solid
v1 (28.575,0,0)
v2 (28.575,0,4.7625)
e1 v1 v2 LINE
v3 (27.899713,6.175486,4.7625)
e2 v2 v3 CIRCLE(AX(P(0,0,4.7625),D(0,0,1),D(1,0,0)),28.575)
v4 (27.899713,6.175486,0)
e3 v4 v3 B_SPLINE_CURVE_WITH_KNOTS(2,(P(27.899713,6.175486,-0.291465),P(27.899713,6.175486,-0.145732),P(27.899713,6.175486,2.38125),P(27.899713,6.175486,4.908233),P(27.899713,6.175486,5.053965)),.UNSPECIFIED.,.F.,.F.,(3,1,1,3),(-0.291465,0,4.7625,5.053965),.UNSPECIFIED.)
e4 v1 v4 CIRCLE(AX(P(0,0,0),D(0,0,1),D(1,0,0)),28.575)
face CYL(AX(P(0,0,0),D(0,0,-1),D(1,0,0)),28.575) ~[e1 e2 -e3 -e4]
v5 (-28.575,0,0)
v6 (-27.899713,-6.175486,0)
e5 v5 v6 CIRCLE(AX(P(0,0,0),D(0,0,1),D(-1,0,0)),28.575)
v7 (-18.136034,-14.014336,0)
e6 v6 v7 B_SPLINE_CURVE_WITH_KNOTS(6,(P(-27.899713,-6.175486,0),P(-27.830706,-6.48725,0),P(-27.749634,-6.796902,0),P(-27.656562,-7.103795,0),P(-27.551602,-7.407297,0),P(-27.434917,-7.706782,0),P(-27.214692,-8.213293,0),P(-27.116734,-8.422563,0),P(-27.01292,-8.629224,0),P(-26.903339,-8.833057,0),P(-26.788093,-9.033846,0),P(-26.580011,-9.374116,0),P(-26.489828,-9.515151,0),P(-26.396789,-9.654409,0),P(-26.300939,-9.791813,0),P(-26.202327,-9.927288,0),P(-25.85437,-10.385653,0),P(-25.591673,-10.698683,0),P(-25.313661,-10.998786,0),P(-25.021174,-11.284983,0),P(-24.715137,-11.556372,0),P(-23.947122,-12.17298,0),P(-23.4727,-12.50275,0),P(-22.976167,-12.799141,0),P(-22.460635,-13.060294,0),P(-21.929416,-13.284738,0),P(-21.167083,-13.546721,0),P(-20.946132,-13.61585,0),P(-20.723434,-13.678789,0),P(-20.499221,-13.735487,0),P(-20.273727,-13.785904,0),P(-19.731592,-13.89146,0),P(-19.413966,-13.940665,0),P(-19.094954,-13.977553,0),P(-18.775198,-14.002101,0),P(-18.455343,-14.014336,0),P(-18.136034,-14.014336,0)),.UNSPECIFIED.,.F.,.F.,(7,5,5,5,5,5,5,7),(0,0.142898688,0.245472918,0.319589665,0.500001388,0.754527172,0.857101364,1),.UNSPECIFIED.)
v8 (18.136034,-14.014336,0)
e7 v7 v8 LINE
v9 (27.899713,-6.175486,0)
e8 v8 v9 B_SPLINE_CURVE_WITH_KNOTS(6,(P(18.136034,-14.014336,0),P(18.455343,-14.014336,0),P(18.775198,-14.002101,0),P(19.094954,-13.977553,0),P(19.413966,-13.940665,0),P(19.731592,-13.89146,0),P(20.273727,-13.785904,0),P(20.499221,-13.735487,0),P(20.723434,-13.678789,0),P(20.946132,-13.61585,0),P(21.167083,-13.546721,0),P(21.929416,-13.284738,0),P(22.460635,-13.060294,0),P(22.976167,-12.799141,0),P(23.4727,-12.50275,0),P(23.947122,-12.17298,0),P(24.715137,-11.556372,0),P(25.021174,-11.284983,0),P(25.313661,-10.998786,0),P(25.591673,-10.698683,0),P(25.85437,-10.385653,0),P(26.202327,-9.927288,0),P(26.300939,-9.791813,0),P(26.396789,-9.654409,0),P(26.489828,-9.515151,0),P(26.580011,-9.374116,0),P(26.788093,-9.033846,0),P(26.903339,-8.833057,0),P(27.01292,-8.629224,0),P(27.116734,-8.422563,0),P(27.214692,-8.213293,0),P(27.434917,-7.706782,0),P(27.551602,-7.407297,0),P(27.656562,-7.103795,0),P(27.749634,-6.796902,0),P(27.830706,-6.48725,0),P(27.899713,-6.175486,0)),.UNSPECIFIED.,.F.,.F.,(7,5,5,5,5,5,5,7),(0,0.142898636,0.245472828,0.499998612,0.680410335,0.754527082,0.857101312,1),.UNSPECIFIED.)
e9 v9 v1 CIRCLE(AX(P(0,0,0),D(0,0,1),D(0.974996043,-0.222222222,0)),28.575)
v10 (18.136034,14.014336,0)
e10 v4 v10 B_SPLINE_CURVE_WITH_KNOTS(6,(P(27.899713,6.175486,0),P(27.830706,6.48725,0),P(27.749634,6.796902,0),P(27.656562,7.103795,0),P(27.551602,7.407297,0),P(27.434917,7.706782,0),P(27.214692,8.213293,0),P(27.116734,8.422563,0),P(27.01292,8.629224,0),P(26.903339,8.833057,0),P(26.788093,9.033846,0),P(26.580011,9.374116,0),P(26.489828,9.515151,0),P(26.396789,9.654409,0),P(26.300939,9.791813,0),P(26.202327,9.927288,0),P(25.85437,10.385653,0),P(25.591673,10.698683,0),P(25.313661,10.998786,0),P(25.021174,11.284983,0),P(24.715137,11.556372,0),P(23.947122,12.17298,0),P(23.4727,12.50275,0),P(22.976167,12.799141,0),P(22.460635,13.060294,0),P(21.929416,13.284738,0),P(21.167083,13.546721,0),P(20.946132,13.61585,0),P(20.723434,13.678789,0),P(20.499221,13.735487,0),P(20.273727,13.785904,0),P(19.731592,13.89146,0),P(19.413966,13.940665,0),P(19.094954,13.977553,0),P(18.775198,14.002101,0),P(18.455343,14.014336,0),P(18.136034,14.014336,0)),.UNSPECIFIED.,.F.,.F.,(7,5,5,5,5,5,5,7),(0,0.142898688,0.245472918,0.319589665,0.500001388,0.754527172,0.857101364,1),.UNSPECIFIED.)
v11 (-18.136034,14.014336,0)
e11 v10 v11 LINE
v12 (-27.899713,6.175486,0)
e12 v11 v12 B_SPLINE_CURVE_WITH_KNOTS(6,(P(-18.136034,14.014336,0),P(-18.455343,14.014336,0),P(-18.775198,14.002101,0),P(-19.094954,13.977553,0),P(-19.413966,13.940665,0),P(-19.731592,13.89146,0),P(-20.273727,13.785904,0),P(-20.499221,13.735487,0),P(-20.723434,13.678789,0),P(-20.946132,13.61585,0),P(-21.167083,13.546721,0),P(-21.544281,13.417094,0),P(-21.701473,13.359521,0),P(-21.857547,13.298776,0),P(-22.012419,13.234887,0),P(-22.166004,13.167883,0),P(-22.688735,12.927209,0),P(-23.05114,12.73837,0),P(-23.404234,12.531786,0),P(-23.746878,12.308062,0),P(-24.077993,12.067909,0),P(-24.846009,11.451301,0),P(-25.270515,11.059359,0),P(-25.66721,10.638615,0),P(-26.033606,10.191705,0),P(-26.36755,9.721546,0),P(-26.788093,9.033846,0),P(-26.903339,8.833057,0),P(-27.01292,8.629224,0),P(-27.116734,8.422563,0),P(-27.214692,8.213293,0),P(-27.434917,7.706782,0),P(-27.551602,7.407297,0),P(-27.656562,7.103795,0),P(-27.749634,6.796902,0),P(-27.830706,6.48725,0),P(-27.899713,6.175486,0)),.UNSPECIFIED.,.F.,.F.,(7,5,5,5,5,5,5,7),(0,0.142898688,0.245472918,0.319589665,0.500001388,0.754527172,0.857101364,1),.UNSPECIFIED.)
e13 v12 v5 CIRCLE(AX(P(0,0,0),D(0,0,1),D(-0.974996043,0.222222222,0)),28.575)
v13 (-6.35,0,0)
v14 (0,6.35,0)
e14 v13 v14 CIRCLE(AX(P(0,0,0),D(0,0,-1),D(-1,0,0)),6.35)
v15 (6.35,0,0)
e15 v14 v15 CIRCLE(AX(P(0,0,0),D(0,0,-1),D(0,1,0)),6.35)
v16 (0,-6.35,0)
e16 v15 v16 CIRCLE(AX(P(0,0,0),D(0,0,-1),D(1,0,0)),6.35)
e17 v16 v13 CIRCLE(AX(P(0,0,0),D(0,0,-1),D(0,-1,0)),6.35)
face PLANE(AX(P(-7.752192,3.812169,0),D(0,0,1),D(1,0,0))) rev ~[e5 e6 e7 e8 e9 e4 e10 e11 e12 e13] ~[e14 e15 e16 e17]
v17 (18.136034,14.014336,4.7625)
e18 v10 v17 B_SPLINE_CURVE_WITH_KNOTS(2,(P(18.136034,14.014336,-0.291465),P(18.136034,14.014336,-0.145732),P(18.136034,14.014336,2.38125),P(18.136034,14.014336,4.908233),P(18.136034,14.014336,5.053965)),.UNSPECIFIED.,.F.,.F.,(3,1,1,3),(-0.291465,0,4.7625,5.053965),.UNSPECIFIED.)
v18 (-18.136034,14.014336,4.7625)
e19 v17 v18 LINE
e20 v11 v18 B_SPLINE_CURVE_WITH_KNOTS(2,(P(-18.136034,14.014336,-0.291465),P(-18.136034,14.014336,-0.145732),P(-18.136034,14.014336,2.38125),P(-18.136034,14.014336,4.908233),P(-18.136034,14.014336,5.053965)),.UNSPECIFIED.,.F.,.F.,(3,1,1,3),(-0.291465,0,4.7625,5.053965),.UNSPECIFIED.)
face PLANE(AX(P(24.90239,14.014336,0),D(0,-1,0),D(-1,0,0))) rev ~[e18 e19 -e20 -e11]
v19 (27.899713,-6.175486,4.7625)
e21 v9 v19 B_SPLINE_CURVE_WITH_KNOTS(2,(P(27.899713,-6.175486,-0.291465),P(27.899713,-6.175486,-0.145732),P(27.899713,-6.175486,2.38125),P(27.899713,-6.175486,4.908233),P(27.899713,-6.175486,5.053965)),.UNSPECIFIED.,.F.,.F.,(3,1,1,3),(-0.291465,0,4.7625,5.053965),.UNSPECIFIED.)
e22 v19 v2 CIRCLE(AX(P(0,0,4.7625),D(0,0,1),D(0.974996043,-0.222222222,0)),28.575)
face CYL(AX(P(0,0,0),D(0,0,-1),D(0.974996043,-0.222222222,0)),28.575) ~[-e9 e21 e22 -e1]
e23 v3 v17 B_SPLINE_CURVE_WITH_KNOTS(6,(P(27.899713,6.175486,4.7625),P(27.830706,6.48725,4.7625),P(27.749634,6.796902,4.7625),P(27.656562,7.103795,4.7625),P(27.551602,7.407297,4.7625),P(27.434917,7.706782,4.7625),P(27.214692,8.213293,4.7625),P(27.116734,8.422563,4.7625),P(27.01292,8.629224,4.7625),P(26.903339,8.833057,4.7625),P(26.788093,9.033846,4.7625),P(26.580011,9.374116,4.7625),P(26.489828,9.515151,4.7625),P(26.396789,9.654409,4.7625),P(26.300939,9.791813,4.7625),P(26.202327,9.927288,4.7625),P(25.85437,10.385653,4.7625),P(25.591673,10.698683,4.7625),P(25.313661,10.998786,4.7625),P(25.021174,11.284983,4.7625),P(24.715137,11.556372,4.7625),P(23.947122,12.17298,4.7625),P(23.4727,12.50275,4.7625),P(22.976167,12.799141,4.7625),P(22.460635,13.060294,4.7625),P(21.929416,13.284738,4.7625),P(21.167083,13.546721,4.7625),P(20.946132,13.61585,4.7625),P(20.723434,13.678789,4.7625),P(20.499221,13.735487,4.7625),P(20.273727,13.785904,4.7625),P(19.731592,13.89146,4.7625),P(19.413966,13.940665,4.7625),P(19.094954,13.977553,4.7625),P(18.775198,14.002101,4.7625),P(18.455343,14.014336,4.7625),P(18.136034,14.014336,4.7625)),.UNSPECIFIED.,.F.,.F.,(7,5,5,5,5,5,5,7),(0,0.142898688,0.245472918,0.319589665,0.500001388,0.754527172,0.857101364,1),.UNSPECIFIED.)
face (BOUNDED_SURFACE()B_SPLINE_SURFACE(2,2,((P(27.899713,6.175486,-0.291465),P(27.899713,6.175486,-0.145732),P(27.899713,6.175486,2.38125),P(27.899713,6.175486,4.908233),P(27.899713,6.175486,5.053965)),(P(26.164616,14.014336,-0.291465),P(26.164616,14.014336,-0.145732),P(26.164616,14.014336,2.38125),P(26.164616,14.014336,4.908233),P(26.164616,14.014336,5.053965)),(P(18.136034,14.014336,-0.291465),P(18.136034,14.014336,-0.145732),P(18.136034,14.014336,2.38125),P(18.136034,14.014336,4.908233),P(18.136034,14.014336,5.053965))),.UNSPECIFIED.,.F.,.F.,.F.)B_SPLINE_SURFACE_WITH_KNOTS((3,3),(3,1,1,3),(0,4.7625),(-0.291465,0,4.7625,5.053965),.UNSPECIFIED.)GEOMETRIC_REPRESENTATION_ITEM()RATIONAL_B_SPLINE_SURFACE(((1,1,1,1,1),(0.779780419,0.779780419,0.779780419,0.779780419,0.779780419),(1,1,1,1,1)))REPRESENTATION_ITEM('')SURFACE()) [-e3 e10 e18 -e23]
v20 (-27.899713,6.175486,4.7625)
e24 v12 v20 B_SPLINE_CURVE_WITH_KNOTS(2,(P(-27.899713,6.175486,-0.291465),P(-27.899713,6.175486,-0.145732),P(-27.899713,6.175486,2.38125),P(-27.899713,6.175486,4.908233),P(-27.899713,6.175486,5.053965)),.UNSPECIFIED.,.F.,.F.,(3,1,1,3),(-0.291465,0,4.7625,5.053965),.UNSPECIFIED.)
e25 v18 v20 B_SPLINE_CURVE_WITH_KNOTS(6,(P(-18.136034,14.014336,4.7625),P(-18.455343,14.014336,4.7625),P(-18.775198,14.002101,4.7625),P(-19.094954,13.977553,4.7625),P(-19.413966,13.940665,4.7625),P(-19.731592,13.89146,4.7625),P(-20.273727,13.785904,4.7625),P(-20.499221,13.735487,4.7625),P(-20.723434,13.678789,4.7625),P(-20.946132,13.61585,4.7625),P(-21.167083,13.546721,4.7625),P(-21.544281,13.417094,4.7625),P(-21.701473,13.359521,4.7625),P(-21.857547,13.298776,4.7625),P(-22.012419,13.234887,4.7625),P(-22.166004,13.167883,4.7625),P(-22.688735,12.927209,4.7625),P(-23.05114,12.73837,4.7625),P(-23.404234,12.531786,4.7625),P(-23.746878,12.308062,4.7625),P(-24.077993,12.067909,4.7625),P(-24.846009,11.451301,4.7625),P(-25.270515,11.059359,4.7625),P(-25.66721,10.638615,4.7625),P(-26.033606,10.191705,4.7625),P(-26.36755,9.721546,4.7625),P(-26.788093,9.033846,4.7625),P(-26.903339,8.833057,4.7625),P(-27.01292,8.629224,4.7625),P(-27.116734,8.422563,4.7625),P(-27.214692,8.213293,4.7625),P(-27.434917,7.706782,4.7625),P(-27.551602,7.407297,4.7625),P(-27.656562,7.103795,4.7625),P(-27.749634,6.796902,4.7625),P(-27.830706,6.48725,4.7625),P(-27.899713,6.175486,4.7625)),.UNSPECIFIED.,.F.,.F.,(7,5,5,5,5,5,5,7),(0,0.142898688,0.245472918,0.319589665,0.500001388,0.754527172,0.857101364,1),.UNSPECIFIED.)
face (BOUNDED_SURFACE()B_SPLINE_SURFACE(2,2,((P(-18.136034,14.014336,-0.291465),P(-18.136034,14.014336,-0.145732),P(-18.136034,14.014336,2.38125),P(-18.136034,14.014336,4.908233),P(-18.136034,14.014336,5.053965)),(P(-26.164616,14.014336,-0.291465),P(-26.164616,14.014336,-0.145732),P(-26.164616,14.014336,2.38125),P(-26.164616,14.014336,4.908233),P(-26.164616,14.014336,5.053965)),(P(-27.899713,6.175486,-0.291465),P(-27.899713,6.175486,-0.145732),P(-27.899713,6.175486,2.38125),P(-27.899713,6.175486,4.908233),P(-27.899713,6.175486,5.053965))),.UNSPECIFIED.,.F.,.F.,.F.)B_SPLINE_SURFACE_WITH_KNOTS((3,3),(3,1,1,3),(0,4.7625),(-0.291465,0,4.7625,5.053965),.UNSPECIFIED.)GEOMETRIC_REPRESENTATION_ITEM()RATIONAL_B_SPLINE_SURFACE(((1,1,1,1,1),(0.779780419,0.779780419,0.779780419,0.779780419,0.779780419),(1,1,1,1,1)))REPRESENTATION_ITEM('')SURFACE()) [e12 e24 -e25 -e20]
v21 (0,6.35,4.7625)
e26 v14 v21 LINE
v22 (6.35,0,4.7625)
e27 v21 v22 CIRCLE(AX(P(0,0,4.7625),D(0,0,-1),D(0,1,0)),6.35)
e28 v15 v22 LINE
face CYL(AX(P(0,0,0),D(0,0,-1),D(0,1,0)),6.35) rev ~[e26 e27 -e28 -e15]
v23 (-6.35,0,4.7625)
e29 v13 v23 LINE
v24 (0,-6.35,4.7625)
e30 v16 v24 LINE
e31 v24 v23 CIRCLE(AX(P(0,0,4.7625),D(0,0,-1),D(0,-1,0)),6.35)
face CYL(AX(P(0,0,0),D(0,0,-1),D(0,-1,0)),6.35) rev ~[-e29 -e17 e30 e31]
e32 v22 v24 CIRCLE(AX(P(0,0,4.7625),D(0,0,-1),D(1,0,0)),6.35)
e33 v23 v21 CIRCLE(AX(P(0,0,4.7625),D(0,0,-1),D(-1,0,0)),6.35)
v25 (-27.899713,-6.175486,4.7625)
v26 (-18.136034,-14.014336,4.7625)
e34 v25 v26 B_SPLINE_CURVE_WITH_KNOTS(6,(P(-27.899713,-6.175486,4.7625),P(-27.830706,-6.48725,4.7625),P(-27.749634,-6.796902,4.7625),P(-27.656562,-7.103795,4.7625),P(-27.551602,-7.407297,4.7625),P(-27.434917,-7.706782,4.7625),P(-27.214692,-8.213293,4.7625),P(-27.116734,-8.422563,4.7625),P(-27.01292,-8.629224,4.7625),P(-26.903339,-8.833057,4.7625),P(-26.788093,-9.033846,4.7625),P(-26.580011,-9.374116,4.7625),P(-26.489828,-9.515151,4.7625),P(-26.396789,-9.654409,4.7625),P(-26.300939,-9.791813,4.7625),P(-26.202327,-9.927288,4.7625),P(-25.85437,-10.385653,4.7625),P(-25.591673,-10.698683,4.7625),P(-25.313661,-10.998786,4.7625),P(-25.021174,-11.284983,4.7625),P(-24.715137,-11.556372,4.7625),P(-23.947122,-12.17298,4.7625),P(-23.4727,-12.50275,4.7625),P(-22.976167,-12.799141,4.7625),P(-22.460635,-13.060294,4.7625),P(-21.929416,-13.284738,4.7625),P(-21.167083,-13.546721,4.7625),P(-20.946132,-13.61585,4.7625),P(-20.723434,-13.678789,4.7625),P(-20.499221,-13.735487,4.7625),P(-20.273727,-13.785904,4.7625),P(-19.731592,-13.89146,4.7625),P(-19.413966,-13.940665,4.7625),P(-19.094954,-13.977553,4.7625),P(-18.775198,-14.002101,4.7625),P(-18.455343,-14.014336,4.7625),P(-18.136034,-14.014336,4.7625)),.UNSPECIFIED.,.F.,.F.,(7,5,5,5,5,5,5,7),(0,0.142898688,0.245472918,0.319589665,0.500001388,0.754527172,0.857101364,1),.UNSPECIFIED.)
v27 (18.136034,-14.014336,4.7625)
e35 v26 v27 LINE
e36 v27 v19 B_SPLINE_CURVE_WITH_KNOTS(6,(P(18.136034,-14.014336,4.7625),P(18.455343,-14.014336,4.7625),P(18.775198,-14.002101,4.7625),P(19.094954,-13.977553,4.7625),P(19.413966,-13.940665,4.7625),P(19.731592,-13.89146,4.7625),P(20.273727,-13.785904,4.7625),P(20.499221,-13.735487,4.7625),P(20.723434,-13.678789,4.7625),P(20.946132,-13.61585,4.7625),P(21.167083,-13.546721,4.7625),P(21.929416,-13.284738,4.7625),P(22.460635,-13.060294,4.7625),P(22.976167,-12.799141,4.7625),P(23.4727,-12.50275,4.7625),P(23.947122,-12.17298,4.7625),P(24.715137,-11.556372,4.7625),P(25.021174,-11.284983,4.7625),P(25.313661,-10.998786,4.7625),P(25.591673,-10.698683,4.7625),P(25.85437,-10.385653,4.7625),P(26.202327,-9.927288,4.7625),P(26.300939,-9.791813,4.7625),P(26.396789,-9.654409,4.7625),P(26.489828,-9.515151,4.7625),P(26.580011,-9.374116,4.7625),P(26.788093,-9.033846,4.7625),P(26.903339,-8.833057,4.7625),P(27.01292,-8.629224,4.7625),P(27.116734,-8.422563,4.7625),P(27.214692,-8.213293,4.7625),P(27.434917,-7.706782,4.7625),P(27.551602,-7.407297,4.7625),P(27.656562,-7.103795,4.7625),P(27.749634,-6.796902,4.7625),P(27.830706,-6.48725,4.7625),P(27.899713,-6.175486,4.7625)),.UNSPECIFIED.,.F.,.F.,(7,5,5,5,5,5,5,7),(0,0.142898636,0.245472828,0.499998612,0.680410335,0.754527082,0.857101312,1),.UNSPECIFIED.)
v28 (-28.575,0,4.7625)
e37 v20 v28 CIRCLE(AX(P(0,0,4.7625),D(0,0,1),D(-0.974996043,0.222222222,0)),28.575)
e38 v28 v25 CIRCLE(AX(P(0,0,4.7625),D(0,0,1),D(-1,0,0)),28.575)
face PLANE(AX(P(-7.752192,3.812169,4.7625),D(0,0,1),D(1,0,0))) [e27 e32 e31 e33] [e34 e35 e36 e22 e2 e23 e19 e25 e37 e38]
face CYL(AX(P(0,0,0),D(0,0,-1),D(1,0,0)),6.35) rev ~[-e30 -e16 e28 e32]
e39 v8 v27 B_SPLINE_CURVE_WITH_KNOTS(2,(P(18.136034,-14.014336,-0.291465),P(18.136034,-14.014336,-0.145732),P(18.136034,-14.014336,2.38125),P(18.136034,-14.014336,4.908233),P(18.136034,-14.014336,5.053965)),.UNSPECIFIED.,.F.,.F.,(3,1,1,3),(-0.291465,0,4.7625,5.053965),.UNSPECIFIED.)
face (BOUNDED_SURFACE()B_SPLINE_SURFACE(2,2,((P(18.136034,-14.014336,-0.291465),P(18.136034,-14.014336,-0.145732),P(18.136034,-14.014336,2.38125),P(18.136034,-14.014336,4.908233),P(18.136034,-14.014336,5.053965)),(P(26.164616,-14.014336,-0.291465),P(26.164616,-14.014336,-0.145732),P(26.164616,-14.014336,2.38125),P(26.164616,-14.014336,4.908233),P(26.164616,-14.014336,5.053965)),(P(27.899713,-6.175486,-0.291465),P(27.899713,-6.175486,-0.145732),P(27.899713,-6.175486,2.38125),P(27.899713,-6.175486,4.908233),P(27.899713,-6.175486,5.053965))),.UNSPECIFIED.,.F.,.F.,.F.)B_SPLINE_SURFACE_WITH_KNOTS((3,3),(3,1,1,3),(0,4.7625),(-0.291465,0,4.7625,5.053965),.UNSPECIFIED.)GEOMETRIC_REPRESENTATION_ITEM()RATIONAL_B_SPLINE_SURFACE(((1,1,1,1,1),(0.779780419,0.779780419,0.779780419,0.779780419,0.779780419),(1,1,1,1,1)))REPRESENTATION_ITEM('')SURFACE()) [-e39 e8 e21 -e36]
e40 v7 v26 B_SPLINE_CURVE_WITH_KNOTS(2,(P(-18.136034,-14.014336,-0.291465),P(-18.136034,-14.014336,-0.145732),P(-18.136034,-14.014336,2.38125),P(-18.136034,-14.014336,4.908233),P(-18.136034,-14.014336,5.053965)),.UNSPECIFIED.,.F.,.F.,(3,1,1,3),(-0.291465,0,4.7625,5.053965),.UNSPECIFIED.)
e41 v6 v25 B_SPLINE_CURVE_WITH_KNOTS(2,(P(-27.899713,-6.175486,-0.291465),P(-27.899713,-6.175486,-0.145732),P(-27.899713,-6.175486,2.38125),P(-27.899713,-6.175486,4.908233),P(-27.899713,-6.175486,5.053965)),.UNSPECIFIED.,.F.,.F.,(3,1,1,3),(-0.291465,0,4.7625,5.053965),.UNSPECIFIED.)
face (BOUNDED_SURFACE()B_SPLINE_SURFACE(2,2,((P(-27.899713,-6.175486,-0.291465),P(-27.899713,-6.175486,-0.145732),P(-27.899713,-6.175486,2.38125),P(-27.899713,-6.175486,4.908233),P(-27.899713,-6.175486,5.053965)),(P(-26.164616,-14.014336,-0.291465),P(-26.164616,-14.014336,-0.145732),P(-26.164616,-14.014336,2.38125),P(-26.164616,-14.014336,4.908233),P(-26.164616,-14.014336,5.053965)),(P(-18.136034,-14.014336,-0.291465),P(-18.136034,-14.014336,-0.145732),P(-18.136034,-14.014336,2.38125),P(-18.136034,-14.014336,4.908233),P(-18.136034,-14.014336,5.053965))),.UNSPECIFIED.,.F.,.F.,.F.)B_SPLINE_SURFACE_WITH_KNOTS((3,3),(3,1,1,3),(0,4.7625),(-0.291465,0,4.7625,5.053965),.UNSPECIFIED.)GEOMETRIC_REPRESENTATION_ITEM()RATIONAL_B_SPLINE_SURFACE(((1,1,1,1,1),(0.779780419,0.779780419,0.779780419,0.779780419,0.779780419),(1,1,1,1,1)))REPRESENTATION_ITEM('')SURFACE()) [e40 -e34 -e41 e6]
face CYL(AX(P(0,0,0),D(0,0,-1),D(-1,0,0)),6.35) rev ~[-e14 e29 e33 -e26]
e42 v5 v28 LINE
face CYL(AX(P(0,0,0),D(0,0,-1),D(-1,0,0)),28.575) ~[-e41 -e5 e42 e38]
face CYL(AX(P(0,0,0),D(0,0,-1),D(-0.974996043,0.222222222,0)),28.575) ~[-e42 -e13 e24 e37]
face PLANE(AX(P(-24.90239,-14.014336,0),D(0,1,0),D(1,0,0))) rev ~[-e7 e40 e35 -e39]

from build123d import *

# Parameters (mm, degrees)
F1_DEPTH = 4.7625
F2_R     = 10


# Not quite as in the source:
# - a feature names something its author has since deleted; it is built from what else it names


with BuildPart() as f1:
    # F0 (on Top) → F1 (new body)
    with BuildSketch(Plane.XY):
        with BuildLine():
            ThreePointArc((-6.35, 0), (-4.4901280605, 4.4901280605), (0, 6.35))
            Line((0, 6.35), (-12.4931629071, 6.35))
            ThreePointArc((-12.4931629071, 6.35), (-13.6287381062, 3.2648303256), (-14.0143362106, 0))
            Line((-14.0143362106, 0), (-6.35, 0))
        make_face()
        with BuildLine():
            ThreePointArc((0, 6.35), (4.4901280605, 4.4901280605), (6.35, 0))
            Line((6.35, 0), (14.0143362106, 0))
            ThreePointArc((14.0143362106, 0), (13.6287381062, 3.2648303256), (12.4931629071, 6.35))
            Line((12.4931629071, 6.35), (0, 6.35))
        make_face()
        with BuildLine():
            Line((12.4931629071, -6.35), (0, -6.35))
            Line((0, -6.35), (0, -14.0143362106))
            ThreePointArc((0, -14.0143362106), (7.3283894713, -11.9455567966), (12.4931629071, -6.35))
        make_face()
        with BuildLine():
            Line((0, -14.0143362106), (0, -6.35))
            Line((0, -6.35), (-12.4931629071, -6.35))
            ThreePointArc((-12.4931629071, -6.35), (-7.3283894713, -11.9455567966), (0, -14.0143362106))
        make_face()
        with BuildLine():
            Line((-12.4931629071, -6.35), (0, -6.35))
            ThreePointArc((0, -6.35), (-4.4901280605, -4.4901280605), (-6.35, 0))
            Line((-6.35, 0), (-14.0143362106, 0))
            ThreePointArc((-14.0143362106, 0), (-13.6287381062, -3.2648303256), (-12.4931629071, -6.35))
        make_face()
        with BuildLine():
            Line((-27.86051193, -6.35), (-12.4931629071, -6.35))
            ThreePointArc((-12.4931629071, -6.35), (-13.6287381062, -3.2648303256), (-14.0143362106, 0))
            Line((-14.0143362106, 0), (-28.575, 0))
            ThreePointArc((-28.575, 0), (-28.395816183, -3.1950349451), (-27.86051193, -6.35))
        make_face()
        with BuildLine():
            ThreePointArc((12.4931629071, 6.35), (13.6287381062, 3.2648303256), (14.0143362106, 0))
            Line((14.0143362106, 0), (28.575, 0))
            ThreePointArc((28.575, 0), (28.395816183, 3.1950349451), (27.86051193, 6.35))
            Line((27.86051193, 6.35), (12.4931629071, 6.35))
        make_face()
        with BuildLine():
            Line((0, 14.0143362106), (0, 6.35))
            Line((0, 6.35), (12.4931629071, 6.35))
            ThreePointArc((12.4931629071, 6.35), (7.3283894713, 11.9455567966), (0, 14.0143362106))
        make_face()
        with BuildLine():
            Line((-12.4931629071, 6.35), (0, 6.35))
            Line((0, 6.35), (0, 14.0143362106))
            ThreePointArc((0, 14.0143362106), (-7.3283894713, 11.9455567966), (-12.4931629071, 6.35))
        make_face()
        with BuildLine():
            Line((-24.9023895556, -14.0143362106), (0, -14.0143362106))
            ThreePointArc((0, -14.0143362106), (-7.3283894713, -11.9455567966), (-12.4931629071, -6.35))
            Line((-12.4931629071, -6.35), (-27.86051193, -6.35))
            ThreePointArc((-27.86051193, -6.35), (-26.6583280736, -10.2890315054), (-24.9023895556, -14.0143362106))
        make_face()
        with BuildLine():
            Line((24.9023895556, 14.0143362106), (0, 14.0143362106))
            ThreePointArc((0, 14.0143362106), (7.3283894713, 11.9455567966), (12.4931629071, 6.35))
            Line((12.4931629071, 6.35), (27.86051193, 6.35))
            ThreePointArc((27.86051193, 6.35), (26.6583280736, 10.2890315054), (24.9023895556, 14.0143362106))
        make_face()
        with BuildLine():
            Line((14.0143362106, 0), (6.35, 0))
            ThreePointArc((6.35, 0), (4.4901280605, -4.4901280605), (0, -6.35))
            Line((0, -6.35), (12.4931629071, -6.35))
            ThreePointArc((12.4931629071, -6.35), (13.6287381062, -3.2648303256), (14.0143362106, 0))
        make_face()
        with BuildLine():
            ThreePointArc((-14.0143362106, 0), (-13.6287381062, 3.2648303256), (-12.4931629071, 6.35))
            Line((-12.4931629071, 6.35), (-27.86051193, 6.35))
            ThreePointArc((-27.86051193, 6.35), (-28.395816183, 3.1950349451), (-28.575, 0))
            Line((-28.575, 0), (-14.0143362106, 0))
        make_face()
        with BuildLine():
            ThreePointArc((-12.4931629071, 6.35), (-7.3283894713, 11.9455567966), (0, 14.0143362106))
            Line((0, 14.0143362106), (-24.9023895556, 14.0143362106))
            ThreePointArc((-24.9023895556, 14.0143362106), (-26.6583280736, 10.2890315054), (-27.86051193, 6.35))
            Line((-27.86051193, 6.35), (-12.4931629071, 6.35))
        make_face()
        with BuildLine():
            Line((28.575, 0), (14.0143362106, 0))
            ThreePointArc((14.0143362106, 0), (13.6287381062, -3.2648303256), (12.4931629071, -6.35))
            Line((12.4931629071, -6.35), (27.86051193, -6.35))
            ThreePointArc((27.86051193, -6.35), (28.395816183, -3.1950349451), (28.575, 0))
        make_face()
        with BuildLine():
            ThreePointArc((12.4931629071, -6.35), (7.3283894713, -11.9455567966), (0, -14.0143362106))
            Line((0, -14.0143362106), (24.9023895556, -14.0143362106))
            ThreePointArc((24.9023895556, -14.0143362106), (26.6583280736, -10.2890315054), (27.86051193, -6.35))
            Line((27.86051193, -6.35), (12.4931629071, -6.35))
        make_face()
    extrude(amount=F1_DEPTH)

    # F2
    f2_edges = [f1.edges().sort_by_distance(p)[0] for p in [
        (24.90239, 14.014336, 2.38125),
        (-24.90239, 14.014336, 2.38125),
        (24.90239, -14.014336, 2.38125),
        (-24.90239, -14.014336, 2.38125),
    ]]
    fillet(f2_edges, radius=F2_R)


solid = f1.part
